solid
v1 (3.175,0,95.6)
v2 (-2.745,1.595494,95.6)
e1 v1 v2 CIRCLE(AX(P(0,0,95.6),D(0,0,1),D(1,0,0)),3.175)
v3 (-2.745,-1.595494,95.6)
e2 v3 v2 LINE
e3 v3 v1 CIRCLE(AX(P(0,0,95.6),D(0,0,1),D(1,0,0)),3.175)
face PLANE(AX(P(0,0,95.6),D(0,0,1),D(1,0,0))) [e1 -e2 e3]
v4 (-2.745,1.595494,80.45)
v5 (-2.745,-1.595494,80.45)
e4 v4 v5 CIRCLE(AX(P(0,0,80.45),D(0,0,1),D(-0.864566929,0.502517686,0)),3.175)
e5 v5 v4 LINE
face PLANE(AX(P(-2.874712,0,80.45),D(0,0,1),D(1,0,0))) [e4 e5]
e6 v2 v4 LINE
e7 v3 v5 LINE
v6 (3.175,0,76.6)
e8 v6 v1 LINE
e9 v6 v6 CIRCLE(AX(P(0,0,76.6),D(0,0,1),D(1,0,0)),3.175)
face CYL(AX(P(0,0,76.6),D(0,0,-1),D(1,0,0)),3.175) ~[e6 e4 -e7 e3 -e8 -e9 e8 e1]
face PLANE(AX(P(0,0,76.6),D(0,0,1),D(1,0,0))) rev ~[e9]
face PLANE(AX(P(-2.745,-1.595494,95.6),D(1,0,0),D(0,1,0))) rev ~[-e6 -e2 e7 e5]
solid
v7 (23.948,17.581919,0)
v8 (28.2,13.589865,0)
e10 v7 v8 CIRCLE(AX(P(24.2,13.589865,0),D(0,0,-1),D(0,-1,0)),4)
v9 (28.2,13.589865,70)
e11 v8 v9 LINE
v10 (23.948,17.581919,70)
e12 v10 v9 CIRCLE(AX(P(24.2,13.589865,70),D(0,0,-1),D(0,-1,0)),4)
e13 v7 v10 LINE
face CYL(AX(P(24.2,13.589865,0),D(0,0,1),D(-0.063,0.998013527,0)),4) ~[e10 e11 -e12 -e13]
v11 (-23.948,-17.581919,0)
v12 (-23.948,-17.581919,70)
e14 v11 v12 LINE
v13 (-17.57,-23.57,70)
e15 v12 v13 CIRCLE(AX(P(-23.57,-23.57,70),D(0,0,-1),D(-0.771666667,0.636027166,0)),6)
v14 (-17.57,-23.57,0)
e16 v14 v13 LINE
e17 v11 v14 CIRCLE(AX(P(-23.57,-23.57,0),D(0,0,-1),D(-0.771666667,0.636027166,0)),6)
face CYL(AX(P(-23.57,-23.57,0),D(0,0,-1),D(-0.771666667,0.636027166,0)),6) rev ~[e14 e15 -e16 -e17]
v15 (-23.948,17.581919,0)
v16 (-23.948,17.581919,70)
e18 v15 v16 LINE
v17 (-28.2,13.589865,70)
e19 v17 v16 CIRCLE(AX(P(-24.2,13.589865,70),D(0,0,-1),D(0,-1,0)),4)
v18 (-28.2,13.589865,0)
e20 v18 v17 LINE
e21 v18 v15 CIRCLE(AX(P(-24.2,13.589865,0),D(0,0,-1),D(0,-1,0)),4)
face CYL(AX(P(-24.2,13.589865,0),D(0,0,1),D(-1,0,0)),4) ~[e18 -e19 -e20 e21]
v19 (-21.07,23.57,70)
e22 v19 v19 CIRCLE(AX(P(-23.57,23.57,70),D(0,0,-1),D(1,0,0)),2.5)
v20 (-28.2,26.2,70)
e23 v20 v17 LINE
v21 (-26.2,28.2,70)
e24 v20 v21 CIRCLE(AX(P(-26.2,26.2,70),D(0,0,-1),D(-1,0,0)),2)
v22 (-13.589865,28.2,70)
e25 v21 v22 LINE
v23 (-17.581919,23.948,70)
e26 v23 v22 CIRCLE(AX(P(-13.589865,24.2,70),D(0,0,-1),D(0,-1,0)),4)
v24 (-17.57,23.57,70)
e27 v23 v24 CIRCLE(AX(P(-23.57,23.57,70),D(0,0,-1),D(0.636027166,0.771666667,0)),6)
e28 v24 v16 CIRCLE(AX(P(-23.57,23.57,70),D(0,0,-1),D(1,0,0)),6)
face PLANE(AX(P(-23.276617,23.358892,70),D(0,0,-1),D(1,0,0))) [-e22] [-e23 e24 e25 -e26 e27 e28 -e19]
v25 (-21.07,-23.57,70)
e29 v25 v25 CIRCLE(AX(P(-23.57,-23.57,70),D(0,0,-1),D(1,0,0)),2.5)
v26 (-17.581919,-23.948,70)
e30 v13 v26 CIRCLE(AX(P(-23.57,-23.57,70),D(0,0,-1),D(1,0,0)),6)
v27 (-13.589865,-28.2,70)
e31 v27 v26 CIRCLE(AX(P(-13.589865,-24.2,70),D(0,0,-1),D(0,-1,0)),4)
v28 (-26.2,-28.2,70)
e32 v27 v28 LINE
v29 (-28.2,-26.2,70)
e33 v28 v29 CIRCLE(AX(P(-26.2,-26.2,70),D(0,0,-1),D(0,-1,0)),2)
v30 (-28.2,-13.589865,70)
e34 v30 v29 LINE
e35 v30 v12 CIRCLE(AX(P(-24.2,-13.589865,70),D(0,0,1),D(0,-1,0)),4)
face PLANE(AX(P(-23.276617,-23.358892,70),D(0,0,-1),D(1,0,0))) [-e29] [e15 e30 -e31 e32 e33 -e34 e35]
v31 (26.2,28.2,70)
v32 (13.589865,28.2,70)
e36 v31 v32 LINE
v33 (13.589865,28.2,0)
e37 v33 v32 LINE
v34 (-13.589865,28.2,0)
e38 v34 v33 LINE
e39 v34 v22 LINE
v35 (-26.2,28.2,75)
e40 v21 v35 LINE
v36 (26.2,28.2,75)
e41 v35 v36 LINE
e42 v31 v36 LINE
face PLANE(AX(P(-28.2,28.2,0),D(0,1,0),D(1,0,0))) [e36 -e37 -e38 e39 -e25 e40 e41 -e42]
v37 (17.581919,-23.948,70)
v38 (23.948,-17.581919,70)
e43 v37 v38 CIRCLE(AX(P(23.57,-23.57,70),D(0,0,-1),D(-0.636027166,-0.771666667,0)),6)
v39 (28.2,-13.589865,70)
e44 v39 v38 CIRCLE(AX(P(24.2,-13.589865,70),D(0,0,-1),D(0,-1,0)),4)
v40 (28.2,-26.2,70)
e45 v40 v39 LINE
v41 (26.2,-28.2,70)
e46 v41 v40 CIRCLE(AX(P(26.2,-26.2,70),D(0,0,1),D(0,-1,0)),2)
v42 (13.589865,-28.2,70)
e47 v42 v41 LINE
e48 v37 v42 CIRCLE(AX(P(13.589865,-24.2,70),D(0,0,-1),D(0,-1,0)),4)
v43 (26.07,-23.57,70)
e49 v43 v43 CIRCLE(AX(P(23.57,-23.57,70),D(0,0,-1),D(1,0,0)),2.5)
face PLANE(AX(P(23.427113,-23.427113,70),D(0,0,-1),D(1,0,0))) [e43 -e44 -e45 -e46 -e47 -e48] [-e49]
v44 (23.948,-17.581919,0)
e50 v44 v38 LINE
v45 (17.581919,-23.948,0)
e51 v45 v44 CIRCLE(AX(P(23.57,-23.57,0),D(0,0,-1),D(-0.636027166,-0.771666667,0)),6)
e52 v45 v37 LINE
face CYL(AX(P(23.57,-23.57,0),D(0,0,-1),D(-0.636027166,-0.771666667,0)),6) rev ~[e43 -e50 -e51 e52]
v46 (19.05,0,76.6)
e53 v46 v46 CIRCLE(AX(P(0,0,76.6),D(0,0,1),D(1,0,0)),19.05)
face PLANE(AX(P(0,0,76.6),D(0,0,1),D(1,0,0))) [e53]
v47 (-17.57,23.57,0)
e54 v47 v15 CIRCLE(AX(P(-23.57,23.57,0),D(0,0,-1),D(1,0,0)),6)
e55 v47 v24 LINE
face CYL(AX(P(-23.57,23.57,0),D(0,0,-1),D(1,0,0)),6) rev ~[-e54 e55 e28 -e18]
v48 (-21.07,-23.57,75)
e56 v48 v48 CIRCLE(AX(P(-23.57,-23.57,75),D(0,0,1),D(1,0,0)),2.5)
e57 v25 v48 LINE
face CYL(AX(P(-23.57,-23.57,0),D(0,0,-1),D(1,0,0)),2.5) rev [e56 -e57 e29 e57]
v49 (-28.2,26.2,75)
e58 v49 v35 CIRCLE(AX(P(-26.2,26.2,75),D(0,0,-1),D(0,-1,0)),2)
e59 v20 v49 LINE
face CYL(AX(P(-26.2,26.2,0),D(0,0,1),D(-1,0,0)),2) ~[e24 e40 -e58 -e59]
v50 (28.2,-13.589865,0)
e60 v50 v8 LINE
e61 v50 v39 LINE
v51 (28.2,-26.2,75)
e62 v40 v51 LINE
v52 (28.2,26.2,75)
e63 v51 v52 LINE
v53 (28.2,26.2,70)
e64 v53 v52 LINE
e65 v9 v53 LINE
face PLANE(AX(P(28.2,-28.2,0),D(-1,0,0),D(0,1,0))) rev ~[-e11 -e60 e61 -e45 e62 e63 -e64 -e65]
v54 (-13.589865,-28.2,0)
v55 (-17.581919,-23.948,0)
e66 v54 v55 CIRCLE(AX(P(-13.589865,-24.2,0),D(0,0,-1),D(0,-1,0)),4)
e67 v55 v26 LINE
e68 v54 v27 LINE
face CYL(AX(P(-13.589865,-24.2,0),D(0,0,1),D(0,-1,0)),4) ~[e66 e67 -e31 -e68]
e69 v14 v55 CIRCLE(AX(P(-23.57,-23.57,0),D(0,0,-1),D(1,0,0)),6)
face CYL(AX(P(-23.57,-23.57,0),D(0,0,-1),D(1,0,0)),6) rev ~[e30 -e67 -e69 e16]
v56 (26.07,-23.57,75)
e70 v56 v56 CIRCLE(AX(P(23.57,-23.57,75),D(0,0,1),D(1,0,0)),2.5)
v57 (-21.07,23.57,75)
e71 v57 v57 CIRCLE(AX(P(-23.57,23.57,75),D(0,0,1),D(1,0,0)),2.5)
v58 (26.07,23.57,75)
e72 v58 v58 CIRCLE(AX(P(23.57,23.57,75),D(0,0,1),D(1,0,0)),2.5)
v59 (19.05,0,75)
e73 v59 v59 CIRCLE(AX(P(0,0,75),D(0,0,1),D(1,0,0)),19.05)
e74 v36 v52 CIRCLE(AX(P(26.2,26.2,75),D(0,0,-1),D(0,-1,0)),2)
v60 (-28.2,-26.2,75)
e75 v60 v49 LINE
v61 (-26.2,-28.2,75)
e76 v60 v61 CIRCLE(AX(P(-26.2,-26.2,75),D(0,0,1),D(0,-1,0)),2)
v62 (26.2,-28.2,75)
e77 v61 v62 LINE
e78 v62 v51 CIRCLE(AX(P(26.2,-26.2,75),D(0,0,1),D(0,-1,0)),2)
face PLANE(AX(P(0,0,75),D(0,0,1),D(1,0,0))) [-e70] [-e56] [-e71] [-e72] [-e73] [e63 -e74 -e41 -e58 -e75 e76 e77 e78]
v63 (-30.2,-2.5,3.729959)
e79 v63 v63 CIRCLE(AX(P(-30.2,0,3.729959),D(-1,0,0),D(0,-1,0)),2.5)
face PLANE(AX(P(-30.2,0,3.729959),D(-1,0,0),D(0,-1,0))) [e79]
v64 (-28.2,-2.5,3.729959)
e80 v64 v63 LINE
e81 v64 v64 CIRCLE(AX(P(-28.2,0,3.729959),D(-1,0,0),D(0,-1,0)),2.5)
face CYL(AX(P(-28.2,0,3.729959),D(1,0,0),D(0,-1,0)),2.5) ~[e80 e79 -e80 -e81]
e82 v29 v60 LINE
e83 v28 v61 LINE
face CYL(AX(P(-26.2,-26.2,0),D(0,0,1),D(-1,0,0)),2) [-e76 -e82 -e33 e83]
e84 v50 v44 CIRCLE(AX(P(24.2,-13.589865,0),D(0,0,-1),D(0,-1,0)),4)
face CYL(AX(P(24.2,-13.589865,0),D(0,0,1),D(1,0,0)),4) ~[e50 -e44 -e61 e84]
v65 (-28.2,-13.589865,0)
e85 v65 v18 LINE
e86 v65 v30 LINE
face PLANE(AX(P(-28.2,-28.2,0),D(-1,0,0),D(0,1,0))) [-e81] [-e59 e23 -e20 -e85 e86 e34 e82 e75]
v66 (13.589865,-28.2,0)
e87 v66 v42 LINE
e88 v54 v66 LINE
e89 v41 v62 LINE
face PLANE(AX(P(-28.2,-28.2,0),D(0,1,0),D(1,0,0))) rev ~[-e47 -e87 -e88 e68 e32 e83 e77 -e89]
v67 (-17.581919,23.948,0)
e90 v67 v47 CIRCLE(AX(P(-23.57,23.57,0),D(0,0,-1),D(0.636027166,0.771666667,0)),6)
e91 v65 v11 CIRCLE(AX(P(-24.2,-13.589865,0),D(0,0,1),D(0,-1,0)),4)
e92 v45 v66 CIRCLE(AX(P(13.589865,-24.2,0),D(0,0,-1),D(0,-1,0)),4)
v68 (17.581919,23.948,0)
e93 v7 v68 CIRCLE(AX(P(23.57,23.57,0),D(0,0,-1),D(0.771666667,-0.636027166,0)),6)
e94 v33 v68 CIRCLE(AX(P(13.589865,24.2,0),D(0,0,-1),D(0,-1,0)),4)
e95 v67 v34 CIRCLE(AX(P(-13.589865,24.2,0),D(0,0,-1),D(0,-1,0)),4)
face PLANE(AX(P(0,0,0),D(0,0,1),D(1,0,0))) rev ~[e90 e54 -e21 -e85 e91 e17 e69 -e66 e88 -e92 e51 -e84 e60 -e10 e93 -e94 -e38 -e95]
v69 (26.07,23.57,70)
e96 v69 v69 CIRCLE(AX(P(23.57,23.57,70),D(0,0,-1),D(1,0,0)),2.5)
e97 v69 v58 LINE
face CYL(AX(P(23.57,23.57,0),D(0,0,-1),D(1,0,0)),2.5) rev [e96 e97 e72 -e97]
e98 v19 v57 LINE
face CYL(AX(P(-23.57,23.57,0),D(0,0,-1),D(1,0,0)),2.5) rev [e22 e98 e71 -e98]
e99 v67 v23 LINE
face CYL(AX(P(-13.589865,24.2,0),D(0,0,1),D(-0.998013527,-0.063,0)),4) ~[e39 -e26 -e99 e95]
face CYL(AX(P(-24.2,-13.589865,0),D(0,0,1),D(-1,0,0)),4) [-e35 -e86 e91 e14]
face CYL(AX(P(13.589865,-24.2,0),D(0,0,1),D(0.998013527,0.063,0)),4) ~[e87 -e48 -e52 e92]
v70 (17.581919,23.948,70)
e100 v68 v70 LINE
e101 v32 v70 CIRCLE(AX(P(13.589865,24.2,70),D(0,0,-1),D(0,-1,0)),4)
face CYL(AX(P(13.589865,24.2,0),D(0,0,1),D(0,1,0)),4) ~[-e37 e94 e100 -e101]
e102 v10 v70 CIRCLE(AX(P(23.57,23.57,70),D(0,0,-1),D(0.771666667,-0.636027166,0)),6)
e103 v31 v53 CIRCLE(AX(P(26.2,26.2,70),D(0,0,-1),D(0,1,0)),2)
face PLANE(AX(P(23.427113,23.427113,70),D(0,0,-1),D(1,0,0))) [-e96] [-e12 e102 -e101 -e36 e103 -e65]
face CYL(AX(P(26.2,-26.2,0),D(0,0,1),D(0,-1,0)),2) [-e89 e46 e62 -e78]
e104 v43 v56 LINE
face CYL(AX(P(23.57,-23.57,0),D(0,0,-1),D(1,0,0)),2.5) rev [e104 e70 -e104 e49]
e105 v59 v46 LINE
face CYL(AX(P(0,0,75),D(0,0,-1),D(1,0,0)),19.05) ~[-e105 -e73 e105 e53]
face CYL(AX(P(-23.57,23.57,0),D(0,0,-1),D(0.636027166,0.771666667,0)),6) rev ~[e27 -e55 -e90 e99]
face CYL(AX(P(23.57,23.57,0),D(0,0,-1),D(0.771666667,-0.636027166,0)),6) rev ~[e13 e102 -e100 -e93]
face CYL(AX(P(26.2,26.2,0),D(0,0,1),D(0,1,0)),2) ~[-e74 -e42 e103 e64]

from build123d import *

# Parameters (mm, degrees)
F0_W      = 56.4
F0_H      = 56.4
F0_R      = 2.5
F1_DEPTH  = 75
F2_R      = 19.05
F3_DEPTH  = 1.6
F4_R      = 3.175
F5_DEPTH  = 19
F6_R      = 2.5
F7_DEPTH  = 2
F8_R      = 2
F10_DEPTH = 15.15
F11_R     = 2.5
F12_DEPTH = 70
F13_R     = 4


with BuildPart() as f1:
    # F0 (on Top) → F1 (new body)
    with BuildSketch(Plane.XY):
        Rectangle(F0_W, F0_H)
        with Locations((-23.57, -23.57)):
            Circle(F0_R, mode=Mode.SUBTRACT)
        with Locations((23.57, -23.57)):
            Circle(F0_R, mode=Mode.SUBTRACT)
        with Locations((-23.57, 23.57)):
            Circle(F0_R, mode=Mode.SUBTRACT)
        with Locations((23.57, 23.57)):
            Circle(F0_R, mode=Mode.SUBTRACT)
    extrude(amount=F1_DEPTH)

    # F2 (on face) → F3 (join)
    with BuildSketch(Plane.XY.offset(75)):
        Circle(F2_R)
    extrude(amount=F3_DEPTH)

    # F6 (on face) → F7 (join)
    with BuildSketch(Plane(origin=(-28.2, 0, 0), x_dir=(0, -1, 0), z_dir=(-1, 0, 0))):
        with Locations((0, 3.7299594842)):
            Circle(F6_R)
    extrude(amount=F7_DEPTH)

    # F8
    f8_edges = [f1.edges().sort_by_distance(p)[0] for p in [
        (-28.2, 28.2, 37.5),
        (28.2, 28.2, 37.5),
        (28.2, -28.2, 37.5),
        (-28.2, -28.2, 37.5),
    ]]
    fillet(f8_edges, radius=F8_R)

    # F11 (on face) → F12 (cut)
    with BuildSketch(Plane(origin=(0, 0, 0), x_dir=(1, 0, 0), z_dir=(0, 0, -1))):
        with BuildLine():
            ThreePointArc((-28.2, 19.7538370056), (-21.5426865067, 17.9228768386), (-17.57, 23.57))
            ThreePointArc((-17.57, 23.57), (-18.1433537997, 26.1295919629), (-19.7538370056, 28.2))
            Line((-19.7538370056, 28.2), (-26.2, 28.2))
            ThreePointArc((-26.2, 28.2), (-27.6142135624, 27.6142135624), (-28.2, 26.2))
            Line((-28.2, 26.2), (-28.2, 19.7538370056))
        make_face()
        with Locations((-23.57, 23.57)):
            Circle(F11_R, mode=Mode.SUBTRACT)
        with BuildLine():
            Line((26.2, 28.2), (19.7538370056, 28.2))
            ThreePointArc((19.7538370056, 28.2), (19.3273593129, 19.3273593129), (28.2, 19.7538370056))
            Line((28.2, 19.7538370056), (28.2, 26.2))
            ThreePointArc((28.2, 26.2), (27.6142135624, 27.6142135624), (26.2, 28.2))
        make_face()
        with Locations((23.57, 23.57)):
            Circle(F11_R, mode=Mode.SUBTRACT)
        with BuildLine():
            ThreePointArc((29.57, 23.57), (26.1295919629, 28.9966462003), (19.7538370056, 28.2))
            Line((19.7538370056, 28.2), (26.2, 28.2))
            ThreePointArc((26.2, 28.2), (27.6142135624, 27.6142135624), (28.2, 26.2))
            Line((28.2, 26.2), (28.2, 19.7538370056))
            ThreePointArc((28.2, 19.7538370056), (29.2171231614, 21.5426865067), (29.57, 23.57))
        make_face()
        with BuildLine():
            ThreePointArc((-17.57, -23.57), (-21.5426865067, -17.9228768386), (-28.2, -19.7538370056))
            Line((-28.2, -19.7538370056), (-28.2, -26.2))
            ThreePointArc((-28.2, -26.2), (-27.6142135624, -27.6142135624), (-26.2, -28.2))
            Line((-26.2, -28.2), (-19.7538370056, -28.2))
            ThreePointArc((-19.7538370056, -28.2), (-18.1433537997, -26.1295919629), (-17.57, -23.57))
        make_face()
        with Locations((-23.57, -23.57)):
            Circle(F11_R, mode=Mode.SUBTRACT)
        with BuildLine():
            Line((28.2, -26.2), (28.2, -19.7538370056))
            ThreePointArc((28.2, -19.7538370056), (19.3273593129, -19.3273593129), (19.7538370056, -28.2))
            Line((19.7538370056, -28.2), (26.2, -28.2))
            ThreePointArc((26.2, -28.2), (27.6142135624, -27.6142135624), (28.2, -26.2))
        make_face()
        with Locations((23.57, -23.57)):
            Circle(F11_R, mode=Mode.SUBTRACT)
        with Locations((-23.57, 23.57)):
            Circle(F11_R)
        with Locations((23.57, 23.57)):
            Circle(F11_R)
        with Locations((-23.57, -23.57)):
            Circle(F11_R)
        with Locations((23.57, -23.57)):
            Circle(F11_R)
    extrude(amount=-F12_DEPTH, mode=Mode.SUBTRACT)

    # F13
    f13_edges = [f1.edges().sort_by_distance(p)[0] for p in [
        (-28.2, 19.753837, 35),
        (-19.753837, 28.2, 35),
        (-28.2, -19.753837, 35),
        (-19.753837, -28.2, 35),
        (19.753837, -28.2, 35),
        (28.2, -19.753837, 35),
        (28.2, 19.753837, 35),
        (19.753837, 28.2, 35),
    ]]
    fillet(f13_edges, radius=F13_R)


with BuildPart() as f5:
    # F4 (on face) → F5 (new body)
    with BuildSketch(Plane.XY.offset(76.6)):
        Circle(F4_R)
    extrude(amount=F5_DEPTH)

    # F9 (on face) → F10 (cut)
    with BuildSketch(Plane.XY.offset(95.6)):
        with BuildLine():
            ThreePointArc((-2.745, 1.595493654), (-3.175, 0), (-2.745, -1.595493654))
            Line((-2.745, -1.595493654), (-2.745, 1.595493654))
        make_face()
    extrude(amount=-F10_DEPTH, mode=Mode.SUBTRACT)


solid = Compound([f1.part, f5.part])
